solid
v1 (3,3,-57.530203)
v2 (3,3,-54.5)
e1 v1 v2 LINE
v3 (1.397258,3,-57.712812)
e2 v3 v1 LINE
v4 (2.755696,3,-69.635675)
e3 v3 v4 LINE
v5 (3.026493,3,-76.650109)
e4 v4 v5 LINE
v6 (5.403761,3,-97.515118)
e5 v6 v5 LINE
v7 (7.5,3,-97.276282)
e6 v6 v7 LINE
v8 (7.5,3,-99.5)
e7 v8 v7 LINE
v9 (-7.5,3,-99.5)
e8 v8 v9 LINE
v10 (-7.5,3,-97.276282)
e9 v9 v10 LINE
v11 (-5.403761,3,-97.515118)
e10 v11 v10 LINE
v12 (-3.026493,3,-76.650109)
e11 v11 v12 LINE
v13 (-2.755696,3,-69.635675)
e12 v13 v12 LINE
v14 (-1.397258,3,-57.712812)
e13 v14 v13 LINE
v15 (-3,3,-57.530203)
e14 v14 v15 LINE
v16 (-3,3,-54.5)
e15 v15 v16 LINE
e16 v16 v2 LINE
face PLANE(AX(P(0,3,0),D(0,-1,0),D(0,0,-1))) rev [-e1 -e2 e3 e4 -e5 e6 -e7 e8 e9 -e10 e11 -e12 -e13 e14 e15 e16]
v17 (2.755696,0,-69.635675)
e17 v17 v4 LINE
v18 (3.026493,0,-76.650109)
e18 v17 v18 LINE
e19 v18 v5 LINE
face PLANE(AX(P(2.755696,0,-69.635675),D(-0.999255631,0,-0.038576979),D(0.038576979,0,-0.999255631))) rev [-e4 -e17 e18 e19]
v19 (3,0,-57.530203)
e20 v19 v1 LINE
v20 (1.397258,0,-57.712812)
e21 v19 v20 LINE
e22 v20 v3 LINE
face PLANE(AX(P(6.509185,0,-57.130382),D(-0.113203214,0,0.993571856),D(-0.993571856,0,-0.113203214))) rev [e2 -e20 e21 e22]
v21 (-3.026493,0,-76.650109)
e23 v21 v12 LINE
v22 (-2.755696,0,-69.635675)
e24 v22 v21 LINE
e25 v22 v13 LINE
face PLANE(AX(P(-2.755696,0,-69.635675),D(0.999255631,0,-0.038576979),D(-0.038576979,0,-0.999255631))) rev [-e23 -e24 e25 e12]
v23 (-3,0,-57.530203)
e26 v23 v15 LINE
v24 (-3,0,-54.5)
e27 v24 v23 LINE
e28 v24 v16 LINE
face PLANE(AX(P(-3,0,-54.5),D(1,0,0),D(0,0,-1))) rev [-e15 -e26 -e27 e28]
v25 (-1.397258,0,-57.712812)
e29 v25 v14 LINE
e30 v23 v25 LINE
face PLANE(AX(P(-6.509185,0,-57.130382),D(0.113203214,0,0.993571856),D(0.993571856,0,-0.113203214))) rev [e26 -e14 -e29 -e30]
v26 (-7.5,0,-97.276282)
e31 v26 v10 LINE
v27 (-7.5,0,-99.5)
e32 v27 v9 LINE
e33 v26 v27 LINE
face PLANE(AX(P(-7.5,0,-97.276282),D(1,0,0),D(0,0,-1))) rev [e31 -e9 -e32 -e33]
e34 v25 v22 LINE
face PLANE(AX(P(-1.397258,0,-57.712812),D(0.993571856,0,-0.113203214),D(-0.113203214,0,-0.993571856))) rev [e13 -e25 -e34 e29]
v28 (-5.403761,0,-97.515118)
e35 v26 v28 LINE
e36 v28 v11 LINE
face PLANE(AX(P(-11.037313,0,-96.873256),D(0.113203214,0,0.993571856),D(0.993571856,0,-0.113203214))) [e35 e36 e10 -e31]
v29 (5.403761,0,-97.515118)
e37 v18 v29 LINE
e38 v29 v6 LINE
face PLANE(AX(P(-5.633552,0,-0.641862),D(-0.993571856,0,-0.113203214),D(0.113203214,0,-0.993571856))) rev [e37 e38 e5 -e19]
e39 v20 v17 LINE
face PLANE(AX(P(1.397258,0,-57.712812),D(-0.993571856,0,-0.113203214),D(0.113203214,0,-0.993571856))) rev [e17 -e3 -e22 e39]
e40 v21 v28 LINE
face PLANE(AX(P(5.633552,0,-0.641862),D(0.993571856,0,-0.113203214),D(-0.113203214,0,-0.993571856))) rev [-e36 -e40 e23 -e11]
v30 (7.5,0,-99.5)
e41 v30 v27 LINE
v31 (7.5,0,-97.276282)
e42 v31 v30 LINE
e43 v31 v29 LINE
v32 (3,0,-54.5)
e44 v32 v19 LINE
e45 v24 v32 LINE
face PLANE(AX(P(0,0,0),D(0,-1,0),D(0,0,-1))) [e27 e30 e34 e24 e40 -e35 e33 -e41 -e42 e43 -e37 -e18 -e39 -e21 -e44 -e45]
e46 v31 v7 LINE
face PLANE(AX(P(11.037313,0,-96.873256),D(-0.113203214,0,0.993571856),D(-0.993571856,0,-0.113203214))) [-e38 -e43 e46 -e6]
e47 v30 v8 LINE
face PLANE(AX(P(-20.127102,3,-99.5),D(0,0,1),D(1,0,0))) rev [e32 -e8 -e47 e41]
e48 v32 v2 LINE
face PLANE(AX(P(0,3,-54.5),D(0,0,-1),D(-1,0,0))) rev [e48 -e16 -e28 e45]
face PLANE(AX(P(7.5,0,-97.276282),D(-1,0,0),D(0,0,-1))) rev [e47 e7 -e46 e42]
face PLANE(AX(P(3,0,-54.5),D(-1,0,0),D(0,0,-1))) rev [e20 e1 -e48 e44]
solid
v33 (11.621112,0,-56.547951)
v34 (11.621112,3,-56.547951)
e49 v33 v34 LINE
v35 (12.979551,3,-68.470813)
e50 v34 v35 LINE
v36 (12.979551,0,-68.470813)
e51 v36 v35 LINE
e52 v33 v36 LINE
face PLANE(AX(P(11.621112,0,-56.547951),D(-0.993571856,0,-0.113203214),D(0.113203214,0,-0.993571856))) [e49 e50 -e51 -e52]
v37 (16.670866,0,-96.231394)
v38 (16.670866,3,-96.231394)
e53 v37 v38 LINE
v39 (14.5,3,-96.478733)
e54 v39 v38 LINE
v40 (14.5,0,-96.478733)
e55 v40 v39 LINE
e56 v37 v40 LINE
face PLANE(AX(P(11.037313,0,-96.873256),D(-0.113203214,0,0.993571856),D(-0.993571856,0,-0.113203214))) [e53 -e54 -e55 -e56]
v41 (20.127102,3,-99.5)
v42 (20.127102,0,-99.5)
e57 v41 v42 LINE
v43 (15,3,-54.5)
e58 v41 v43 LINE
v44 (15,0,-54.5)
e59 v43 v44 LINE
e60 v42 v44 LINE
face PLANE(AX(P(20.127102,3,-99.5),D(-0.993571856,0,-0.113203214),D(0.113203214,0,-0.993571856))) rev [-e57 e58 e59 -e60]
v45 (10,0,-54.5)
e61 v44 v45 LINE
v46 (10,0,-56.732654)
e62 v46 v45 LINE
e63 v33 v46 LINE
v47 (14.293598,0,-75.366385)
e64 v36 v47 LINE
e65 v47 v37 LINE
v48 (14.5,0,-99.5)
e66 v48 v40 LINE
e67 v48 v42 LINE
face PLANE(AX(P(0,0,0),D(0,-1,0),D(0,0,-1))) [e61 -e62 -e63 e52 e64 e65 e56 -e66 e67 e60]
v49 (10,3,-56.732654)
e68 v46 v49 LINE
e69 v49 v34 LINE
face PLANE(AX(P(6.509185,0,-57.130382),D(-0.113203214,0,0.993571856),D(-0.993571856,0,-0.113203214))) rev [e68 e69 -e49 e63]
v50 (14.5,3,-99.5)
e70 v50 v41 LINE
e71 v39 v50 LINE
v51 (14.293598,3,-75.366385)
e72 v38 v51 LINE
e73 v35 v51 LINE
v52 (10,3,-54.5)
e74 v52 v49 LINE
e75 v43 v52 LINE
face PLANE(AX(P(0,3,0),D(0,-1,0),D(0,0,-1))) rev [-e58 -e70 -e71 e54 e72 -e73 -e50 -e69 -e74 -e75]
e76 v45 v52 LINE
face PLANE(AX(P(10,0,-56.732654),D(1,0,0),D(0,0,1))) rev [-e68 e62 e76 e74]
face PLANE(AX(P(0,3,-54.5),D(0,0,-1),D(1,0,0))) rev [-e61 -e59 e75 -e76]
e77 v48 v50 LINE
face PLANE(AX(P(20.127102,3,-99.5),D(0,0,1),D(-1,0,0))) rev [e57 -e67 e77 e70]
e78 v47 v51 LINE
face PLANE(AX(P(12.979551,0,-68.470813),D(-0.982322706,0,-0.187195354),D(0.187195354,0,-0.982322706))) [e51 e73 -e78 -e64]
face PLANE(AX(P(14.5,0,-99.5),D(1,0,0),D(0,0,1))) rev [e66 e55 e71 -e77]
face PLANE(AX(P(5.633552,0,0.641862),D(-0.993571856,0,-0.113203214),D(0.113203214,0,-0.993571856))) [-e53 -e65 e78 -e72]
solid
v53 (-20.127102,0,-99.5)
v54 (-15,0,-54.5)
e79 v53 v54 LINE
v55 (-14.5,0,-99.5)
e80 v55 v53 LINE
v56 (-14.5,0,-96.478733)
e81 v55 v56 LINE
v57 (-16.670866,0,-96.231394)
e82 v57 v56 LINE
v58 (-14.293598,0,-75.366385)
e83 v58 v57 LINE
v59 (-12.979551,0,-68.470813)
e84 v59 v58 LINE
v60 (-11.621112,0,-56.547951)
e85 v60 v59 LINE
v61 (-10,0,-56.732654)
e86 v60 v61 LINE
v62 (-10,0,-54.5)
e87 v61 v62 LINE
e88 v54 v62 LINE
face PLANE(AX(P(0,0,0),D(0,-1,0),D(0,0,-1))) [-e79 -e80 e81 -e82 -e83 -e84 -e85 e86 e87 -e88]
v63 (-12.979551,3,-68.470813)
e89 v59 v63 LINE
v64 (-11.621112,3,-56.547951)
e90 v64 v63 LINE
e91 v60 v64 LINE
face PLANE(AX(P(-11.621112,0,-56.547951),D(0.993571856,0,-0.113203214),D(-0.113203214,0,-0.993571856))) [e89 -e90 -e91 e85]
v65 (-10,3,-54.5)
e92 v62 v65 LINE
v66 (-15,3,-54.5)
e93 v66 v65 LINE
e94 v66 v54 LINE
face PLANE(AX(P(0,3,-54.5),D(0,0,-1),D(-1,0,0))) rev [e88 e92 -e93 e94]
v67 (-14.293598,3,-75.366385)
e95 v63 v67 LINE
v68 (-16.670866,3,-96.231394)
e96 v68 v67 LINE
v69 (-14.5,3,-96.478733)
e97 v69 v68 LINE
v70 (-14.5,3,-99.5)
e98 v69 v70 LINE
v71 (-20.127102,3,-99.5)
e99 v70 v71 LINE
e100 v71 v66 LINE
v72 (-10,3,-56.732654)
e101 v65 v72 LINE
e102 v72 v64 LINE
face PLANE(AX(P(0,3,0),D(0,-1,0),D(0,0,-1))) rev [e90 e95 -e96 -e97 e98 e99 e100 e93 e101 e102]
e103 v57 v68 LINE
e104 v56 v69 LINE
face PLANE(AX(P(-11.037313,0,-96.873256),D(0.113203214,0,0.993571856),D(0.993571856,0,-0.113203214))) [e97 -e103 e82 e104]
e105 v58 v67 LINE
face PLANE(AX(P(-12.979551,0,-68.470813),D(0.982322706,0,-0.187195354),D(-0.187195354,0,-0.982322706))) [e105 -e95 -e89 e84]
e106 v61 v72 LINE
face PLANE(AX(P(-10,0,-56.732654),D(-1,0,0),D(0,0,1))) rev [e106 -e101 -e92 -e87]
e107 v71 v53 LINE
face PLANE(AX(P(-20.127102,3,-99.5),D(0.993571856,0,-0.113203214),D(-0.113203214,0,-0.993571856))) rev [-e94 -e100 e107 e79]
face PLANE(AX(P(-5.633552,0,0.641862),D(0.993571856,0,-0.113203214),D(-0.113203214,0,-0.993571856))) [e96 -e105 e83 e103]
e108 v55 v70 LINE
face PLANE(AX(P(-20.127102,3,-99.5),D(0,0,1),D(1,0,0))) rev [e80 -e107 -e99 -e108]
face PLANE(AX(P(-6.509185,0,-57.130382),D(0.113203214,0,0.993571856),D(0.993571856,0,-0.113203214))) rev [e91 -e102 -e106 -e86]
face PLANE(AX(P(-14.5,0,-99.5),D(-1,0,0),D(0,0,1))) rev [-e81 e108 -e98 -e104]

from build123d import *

# Parameters (mm, degrees)
BOSS_EXTRUDE1_DEPTH = 3
CUT_EXTRUDE1_DEPTH  = 102.55958965
BOSS_EXTRUDE2_DEPTH = 3
CUT_EXTRUDE7_DEPTH  = 102.55958965
CUT_EXTRUDE9_DEPTH  = 102.55958965
MIRROR10_DEPTH      = 3


# Read off the part's stored shape, not the designer's step: Mirror10
with BuildPart() as part:
    # Sketch1 → Boss-Extrude1 (new body)
    with BuildSketch(Plane(origin=(0, 0, 0), x_dir=(1, 0, 0), z_dir=(0, 1, 0))):
        Polygon((-20.127102374, 99.5), (-15, 54.5), (0, 54.5), (0, 99.5), align=None)
    extrude(amount=BOSS_EXTRUDE1_DEPTH)

    # Sketch2 → Cut-Extrude1 (cut, symmetric)
    with BuildSketch(Plane(origin=(0, 3, 0), x_dir=(1, 0, 0), z_dir=(0, 1, 0))):
        Polygon((-12.142737213, 56.488519479), (-0.87563237, 57.772243923), (-5.403760921, 97.515118151), (-16.670865764, 96.231393706), align=None)
    extrude(amount=CUT_EXTRUDE1_DEPTH, both=True, mode=Mode.SUBTRACT)

    # Sketch6 → Boss-Extrude2 (add)
    with BuildSketch(Plane(origin=(0, 3, 0), x_dir=(1, 0, 0), z_dir=(0, 1, 0))):
        Polygon((-12.142737213, 56.488519479), (-11.621111989, 56.547951167), (-12.979550554, 68.470813435), (-14.293598275, 75.366384737), align=None)
    boss_extrude2 = extrude(amount=-BOSS_EXTRUDE2_DEPTH)

    # Mirror3: Boss-Extrude2 across plane
    add(boss_extrude2.mirror(Plane(origin=(0, 0, 0), x_dir=(0.11320321376790746, 0, 0.9935718556765873), z_dir=(0.9935718556765875, 0, -0.11320321376790746))))

    # Sketch7 → Cut-Extrude7 (cut, symmetric)
    with BuildSketch(Plane(origin=(0, 3, 0), x_dir=(1, 0, 0), z_dir=(0, 1, 0))):
        Polygon((-14.5, 99.5), (-14.5, 96.478732618), (-7.5, 97.276281876), (-7.5, 99.5), align=None)
    extrude(amount=CUT_EXTRUDE7_DEPTH, both=True, mode=Mode.SUBTRACT)

    # Sketch14 → Cut-Extrude9 (cut, symmetric)
    with BuildSketch(Plane(origin=(0, 3, 0), x_dir=(1, 0, 0), z_dir=(0, 1, 0))):
        Polygon((-10, 56.732653547), (-10, 54.5), (-3, 54.5), (-3, 57.530202805), align=None)
    extrude(amount=CUT_EXTRUDE9_DEPTH, both=True, mode=Mode.SUBTRACT)


with BuildPart() as cut_extrude9_piece_1:
    # of the separate pieces the step leaves, piece 1, a body of its own (cut_extrude9_pieces)
    add(part.part.solids().sort_by_distance((-20.127102374, 0, -99.5))[0])


with BuildPart() as cut_extrude9_piece_2:
    # of the separate pieces the step leaves, piece 2, a body of its own (cut_extrude9_pieces)
    add(part.part.solids().sort_by_distance((-3, 0, -54.5))[0])

    # Mirror10 outline → Mirror10 (add)
    with BuildSketch(Plane(origin=(0, 0, 0), x_dir=(1, 0, 0), z_dir=(0, 1, 0))):
        Polygon((0, 54.5), (3, 54.5), (3, 57.530202805), (1.397257594, 57.712812236), (2.755696159, 69.635674504), (3.026493432, 76.650109181), (5.403760921, 97.515118151), (7.5, 97.276281876), (7.5, 99.5), (0, 99.5), align=None)
    extrude(amount=MIRROR10_DEPTH)


with BuildPart() as body_3:
    # Mirror12: mirrored copy
    add(cut_extrude9_piece_1.part.mirror(Plane(origin=(0, 0, 0), x_dir=(0, 0, 1), z_dir=(1, 0, 0))))


solid = Compound([cut_extrude9_piece_1.part, cut_extrude9_piece_2.part, body_3.part])
